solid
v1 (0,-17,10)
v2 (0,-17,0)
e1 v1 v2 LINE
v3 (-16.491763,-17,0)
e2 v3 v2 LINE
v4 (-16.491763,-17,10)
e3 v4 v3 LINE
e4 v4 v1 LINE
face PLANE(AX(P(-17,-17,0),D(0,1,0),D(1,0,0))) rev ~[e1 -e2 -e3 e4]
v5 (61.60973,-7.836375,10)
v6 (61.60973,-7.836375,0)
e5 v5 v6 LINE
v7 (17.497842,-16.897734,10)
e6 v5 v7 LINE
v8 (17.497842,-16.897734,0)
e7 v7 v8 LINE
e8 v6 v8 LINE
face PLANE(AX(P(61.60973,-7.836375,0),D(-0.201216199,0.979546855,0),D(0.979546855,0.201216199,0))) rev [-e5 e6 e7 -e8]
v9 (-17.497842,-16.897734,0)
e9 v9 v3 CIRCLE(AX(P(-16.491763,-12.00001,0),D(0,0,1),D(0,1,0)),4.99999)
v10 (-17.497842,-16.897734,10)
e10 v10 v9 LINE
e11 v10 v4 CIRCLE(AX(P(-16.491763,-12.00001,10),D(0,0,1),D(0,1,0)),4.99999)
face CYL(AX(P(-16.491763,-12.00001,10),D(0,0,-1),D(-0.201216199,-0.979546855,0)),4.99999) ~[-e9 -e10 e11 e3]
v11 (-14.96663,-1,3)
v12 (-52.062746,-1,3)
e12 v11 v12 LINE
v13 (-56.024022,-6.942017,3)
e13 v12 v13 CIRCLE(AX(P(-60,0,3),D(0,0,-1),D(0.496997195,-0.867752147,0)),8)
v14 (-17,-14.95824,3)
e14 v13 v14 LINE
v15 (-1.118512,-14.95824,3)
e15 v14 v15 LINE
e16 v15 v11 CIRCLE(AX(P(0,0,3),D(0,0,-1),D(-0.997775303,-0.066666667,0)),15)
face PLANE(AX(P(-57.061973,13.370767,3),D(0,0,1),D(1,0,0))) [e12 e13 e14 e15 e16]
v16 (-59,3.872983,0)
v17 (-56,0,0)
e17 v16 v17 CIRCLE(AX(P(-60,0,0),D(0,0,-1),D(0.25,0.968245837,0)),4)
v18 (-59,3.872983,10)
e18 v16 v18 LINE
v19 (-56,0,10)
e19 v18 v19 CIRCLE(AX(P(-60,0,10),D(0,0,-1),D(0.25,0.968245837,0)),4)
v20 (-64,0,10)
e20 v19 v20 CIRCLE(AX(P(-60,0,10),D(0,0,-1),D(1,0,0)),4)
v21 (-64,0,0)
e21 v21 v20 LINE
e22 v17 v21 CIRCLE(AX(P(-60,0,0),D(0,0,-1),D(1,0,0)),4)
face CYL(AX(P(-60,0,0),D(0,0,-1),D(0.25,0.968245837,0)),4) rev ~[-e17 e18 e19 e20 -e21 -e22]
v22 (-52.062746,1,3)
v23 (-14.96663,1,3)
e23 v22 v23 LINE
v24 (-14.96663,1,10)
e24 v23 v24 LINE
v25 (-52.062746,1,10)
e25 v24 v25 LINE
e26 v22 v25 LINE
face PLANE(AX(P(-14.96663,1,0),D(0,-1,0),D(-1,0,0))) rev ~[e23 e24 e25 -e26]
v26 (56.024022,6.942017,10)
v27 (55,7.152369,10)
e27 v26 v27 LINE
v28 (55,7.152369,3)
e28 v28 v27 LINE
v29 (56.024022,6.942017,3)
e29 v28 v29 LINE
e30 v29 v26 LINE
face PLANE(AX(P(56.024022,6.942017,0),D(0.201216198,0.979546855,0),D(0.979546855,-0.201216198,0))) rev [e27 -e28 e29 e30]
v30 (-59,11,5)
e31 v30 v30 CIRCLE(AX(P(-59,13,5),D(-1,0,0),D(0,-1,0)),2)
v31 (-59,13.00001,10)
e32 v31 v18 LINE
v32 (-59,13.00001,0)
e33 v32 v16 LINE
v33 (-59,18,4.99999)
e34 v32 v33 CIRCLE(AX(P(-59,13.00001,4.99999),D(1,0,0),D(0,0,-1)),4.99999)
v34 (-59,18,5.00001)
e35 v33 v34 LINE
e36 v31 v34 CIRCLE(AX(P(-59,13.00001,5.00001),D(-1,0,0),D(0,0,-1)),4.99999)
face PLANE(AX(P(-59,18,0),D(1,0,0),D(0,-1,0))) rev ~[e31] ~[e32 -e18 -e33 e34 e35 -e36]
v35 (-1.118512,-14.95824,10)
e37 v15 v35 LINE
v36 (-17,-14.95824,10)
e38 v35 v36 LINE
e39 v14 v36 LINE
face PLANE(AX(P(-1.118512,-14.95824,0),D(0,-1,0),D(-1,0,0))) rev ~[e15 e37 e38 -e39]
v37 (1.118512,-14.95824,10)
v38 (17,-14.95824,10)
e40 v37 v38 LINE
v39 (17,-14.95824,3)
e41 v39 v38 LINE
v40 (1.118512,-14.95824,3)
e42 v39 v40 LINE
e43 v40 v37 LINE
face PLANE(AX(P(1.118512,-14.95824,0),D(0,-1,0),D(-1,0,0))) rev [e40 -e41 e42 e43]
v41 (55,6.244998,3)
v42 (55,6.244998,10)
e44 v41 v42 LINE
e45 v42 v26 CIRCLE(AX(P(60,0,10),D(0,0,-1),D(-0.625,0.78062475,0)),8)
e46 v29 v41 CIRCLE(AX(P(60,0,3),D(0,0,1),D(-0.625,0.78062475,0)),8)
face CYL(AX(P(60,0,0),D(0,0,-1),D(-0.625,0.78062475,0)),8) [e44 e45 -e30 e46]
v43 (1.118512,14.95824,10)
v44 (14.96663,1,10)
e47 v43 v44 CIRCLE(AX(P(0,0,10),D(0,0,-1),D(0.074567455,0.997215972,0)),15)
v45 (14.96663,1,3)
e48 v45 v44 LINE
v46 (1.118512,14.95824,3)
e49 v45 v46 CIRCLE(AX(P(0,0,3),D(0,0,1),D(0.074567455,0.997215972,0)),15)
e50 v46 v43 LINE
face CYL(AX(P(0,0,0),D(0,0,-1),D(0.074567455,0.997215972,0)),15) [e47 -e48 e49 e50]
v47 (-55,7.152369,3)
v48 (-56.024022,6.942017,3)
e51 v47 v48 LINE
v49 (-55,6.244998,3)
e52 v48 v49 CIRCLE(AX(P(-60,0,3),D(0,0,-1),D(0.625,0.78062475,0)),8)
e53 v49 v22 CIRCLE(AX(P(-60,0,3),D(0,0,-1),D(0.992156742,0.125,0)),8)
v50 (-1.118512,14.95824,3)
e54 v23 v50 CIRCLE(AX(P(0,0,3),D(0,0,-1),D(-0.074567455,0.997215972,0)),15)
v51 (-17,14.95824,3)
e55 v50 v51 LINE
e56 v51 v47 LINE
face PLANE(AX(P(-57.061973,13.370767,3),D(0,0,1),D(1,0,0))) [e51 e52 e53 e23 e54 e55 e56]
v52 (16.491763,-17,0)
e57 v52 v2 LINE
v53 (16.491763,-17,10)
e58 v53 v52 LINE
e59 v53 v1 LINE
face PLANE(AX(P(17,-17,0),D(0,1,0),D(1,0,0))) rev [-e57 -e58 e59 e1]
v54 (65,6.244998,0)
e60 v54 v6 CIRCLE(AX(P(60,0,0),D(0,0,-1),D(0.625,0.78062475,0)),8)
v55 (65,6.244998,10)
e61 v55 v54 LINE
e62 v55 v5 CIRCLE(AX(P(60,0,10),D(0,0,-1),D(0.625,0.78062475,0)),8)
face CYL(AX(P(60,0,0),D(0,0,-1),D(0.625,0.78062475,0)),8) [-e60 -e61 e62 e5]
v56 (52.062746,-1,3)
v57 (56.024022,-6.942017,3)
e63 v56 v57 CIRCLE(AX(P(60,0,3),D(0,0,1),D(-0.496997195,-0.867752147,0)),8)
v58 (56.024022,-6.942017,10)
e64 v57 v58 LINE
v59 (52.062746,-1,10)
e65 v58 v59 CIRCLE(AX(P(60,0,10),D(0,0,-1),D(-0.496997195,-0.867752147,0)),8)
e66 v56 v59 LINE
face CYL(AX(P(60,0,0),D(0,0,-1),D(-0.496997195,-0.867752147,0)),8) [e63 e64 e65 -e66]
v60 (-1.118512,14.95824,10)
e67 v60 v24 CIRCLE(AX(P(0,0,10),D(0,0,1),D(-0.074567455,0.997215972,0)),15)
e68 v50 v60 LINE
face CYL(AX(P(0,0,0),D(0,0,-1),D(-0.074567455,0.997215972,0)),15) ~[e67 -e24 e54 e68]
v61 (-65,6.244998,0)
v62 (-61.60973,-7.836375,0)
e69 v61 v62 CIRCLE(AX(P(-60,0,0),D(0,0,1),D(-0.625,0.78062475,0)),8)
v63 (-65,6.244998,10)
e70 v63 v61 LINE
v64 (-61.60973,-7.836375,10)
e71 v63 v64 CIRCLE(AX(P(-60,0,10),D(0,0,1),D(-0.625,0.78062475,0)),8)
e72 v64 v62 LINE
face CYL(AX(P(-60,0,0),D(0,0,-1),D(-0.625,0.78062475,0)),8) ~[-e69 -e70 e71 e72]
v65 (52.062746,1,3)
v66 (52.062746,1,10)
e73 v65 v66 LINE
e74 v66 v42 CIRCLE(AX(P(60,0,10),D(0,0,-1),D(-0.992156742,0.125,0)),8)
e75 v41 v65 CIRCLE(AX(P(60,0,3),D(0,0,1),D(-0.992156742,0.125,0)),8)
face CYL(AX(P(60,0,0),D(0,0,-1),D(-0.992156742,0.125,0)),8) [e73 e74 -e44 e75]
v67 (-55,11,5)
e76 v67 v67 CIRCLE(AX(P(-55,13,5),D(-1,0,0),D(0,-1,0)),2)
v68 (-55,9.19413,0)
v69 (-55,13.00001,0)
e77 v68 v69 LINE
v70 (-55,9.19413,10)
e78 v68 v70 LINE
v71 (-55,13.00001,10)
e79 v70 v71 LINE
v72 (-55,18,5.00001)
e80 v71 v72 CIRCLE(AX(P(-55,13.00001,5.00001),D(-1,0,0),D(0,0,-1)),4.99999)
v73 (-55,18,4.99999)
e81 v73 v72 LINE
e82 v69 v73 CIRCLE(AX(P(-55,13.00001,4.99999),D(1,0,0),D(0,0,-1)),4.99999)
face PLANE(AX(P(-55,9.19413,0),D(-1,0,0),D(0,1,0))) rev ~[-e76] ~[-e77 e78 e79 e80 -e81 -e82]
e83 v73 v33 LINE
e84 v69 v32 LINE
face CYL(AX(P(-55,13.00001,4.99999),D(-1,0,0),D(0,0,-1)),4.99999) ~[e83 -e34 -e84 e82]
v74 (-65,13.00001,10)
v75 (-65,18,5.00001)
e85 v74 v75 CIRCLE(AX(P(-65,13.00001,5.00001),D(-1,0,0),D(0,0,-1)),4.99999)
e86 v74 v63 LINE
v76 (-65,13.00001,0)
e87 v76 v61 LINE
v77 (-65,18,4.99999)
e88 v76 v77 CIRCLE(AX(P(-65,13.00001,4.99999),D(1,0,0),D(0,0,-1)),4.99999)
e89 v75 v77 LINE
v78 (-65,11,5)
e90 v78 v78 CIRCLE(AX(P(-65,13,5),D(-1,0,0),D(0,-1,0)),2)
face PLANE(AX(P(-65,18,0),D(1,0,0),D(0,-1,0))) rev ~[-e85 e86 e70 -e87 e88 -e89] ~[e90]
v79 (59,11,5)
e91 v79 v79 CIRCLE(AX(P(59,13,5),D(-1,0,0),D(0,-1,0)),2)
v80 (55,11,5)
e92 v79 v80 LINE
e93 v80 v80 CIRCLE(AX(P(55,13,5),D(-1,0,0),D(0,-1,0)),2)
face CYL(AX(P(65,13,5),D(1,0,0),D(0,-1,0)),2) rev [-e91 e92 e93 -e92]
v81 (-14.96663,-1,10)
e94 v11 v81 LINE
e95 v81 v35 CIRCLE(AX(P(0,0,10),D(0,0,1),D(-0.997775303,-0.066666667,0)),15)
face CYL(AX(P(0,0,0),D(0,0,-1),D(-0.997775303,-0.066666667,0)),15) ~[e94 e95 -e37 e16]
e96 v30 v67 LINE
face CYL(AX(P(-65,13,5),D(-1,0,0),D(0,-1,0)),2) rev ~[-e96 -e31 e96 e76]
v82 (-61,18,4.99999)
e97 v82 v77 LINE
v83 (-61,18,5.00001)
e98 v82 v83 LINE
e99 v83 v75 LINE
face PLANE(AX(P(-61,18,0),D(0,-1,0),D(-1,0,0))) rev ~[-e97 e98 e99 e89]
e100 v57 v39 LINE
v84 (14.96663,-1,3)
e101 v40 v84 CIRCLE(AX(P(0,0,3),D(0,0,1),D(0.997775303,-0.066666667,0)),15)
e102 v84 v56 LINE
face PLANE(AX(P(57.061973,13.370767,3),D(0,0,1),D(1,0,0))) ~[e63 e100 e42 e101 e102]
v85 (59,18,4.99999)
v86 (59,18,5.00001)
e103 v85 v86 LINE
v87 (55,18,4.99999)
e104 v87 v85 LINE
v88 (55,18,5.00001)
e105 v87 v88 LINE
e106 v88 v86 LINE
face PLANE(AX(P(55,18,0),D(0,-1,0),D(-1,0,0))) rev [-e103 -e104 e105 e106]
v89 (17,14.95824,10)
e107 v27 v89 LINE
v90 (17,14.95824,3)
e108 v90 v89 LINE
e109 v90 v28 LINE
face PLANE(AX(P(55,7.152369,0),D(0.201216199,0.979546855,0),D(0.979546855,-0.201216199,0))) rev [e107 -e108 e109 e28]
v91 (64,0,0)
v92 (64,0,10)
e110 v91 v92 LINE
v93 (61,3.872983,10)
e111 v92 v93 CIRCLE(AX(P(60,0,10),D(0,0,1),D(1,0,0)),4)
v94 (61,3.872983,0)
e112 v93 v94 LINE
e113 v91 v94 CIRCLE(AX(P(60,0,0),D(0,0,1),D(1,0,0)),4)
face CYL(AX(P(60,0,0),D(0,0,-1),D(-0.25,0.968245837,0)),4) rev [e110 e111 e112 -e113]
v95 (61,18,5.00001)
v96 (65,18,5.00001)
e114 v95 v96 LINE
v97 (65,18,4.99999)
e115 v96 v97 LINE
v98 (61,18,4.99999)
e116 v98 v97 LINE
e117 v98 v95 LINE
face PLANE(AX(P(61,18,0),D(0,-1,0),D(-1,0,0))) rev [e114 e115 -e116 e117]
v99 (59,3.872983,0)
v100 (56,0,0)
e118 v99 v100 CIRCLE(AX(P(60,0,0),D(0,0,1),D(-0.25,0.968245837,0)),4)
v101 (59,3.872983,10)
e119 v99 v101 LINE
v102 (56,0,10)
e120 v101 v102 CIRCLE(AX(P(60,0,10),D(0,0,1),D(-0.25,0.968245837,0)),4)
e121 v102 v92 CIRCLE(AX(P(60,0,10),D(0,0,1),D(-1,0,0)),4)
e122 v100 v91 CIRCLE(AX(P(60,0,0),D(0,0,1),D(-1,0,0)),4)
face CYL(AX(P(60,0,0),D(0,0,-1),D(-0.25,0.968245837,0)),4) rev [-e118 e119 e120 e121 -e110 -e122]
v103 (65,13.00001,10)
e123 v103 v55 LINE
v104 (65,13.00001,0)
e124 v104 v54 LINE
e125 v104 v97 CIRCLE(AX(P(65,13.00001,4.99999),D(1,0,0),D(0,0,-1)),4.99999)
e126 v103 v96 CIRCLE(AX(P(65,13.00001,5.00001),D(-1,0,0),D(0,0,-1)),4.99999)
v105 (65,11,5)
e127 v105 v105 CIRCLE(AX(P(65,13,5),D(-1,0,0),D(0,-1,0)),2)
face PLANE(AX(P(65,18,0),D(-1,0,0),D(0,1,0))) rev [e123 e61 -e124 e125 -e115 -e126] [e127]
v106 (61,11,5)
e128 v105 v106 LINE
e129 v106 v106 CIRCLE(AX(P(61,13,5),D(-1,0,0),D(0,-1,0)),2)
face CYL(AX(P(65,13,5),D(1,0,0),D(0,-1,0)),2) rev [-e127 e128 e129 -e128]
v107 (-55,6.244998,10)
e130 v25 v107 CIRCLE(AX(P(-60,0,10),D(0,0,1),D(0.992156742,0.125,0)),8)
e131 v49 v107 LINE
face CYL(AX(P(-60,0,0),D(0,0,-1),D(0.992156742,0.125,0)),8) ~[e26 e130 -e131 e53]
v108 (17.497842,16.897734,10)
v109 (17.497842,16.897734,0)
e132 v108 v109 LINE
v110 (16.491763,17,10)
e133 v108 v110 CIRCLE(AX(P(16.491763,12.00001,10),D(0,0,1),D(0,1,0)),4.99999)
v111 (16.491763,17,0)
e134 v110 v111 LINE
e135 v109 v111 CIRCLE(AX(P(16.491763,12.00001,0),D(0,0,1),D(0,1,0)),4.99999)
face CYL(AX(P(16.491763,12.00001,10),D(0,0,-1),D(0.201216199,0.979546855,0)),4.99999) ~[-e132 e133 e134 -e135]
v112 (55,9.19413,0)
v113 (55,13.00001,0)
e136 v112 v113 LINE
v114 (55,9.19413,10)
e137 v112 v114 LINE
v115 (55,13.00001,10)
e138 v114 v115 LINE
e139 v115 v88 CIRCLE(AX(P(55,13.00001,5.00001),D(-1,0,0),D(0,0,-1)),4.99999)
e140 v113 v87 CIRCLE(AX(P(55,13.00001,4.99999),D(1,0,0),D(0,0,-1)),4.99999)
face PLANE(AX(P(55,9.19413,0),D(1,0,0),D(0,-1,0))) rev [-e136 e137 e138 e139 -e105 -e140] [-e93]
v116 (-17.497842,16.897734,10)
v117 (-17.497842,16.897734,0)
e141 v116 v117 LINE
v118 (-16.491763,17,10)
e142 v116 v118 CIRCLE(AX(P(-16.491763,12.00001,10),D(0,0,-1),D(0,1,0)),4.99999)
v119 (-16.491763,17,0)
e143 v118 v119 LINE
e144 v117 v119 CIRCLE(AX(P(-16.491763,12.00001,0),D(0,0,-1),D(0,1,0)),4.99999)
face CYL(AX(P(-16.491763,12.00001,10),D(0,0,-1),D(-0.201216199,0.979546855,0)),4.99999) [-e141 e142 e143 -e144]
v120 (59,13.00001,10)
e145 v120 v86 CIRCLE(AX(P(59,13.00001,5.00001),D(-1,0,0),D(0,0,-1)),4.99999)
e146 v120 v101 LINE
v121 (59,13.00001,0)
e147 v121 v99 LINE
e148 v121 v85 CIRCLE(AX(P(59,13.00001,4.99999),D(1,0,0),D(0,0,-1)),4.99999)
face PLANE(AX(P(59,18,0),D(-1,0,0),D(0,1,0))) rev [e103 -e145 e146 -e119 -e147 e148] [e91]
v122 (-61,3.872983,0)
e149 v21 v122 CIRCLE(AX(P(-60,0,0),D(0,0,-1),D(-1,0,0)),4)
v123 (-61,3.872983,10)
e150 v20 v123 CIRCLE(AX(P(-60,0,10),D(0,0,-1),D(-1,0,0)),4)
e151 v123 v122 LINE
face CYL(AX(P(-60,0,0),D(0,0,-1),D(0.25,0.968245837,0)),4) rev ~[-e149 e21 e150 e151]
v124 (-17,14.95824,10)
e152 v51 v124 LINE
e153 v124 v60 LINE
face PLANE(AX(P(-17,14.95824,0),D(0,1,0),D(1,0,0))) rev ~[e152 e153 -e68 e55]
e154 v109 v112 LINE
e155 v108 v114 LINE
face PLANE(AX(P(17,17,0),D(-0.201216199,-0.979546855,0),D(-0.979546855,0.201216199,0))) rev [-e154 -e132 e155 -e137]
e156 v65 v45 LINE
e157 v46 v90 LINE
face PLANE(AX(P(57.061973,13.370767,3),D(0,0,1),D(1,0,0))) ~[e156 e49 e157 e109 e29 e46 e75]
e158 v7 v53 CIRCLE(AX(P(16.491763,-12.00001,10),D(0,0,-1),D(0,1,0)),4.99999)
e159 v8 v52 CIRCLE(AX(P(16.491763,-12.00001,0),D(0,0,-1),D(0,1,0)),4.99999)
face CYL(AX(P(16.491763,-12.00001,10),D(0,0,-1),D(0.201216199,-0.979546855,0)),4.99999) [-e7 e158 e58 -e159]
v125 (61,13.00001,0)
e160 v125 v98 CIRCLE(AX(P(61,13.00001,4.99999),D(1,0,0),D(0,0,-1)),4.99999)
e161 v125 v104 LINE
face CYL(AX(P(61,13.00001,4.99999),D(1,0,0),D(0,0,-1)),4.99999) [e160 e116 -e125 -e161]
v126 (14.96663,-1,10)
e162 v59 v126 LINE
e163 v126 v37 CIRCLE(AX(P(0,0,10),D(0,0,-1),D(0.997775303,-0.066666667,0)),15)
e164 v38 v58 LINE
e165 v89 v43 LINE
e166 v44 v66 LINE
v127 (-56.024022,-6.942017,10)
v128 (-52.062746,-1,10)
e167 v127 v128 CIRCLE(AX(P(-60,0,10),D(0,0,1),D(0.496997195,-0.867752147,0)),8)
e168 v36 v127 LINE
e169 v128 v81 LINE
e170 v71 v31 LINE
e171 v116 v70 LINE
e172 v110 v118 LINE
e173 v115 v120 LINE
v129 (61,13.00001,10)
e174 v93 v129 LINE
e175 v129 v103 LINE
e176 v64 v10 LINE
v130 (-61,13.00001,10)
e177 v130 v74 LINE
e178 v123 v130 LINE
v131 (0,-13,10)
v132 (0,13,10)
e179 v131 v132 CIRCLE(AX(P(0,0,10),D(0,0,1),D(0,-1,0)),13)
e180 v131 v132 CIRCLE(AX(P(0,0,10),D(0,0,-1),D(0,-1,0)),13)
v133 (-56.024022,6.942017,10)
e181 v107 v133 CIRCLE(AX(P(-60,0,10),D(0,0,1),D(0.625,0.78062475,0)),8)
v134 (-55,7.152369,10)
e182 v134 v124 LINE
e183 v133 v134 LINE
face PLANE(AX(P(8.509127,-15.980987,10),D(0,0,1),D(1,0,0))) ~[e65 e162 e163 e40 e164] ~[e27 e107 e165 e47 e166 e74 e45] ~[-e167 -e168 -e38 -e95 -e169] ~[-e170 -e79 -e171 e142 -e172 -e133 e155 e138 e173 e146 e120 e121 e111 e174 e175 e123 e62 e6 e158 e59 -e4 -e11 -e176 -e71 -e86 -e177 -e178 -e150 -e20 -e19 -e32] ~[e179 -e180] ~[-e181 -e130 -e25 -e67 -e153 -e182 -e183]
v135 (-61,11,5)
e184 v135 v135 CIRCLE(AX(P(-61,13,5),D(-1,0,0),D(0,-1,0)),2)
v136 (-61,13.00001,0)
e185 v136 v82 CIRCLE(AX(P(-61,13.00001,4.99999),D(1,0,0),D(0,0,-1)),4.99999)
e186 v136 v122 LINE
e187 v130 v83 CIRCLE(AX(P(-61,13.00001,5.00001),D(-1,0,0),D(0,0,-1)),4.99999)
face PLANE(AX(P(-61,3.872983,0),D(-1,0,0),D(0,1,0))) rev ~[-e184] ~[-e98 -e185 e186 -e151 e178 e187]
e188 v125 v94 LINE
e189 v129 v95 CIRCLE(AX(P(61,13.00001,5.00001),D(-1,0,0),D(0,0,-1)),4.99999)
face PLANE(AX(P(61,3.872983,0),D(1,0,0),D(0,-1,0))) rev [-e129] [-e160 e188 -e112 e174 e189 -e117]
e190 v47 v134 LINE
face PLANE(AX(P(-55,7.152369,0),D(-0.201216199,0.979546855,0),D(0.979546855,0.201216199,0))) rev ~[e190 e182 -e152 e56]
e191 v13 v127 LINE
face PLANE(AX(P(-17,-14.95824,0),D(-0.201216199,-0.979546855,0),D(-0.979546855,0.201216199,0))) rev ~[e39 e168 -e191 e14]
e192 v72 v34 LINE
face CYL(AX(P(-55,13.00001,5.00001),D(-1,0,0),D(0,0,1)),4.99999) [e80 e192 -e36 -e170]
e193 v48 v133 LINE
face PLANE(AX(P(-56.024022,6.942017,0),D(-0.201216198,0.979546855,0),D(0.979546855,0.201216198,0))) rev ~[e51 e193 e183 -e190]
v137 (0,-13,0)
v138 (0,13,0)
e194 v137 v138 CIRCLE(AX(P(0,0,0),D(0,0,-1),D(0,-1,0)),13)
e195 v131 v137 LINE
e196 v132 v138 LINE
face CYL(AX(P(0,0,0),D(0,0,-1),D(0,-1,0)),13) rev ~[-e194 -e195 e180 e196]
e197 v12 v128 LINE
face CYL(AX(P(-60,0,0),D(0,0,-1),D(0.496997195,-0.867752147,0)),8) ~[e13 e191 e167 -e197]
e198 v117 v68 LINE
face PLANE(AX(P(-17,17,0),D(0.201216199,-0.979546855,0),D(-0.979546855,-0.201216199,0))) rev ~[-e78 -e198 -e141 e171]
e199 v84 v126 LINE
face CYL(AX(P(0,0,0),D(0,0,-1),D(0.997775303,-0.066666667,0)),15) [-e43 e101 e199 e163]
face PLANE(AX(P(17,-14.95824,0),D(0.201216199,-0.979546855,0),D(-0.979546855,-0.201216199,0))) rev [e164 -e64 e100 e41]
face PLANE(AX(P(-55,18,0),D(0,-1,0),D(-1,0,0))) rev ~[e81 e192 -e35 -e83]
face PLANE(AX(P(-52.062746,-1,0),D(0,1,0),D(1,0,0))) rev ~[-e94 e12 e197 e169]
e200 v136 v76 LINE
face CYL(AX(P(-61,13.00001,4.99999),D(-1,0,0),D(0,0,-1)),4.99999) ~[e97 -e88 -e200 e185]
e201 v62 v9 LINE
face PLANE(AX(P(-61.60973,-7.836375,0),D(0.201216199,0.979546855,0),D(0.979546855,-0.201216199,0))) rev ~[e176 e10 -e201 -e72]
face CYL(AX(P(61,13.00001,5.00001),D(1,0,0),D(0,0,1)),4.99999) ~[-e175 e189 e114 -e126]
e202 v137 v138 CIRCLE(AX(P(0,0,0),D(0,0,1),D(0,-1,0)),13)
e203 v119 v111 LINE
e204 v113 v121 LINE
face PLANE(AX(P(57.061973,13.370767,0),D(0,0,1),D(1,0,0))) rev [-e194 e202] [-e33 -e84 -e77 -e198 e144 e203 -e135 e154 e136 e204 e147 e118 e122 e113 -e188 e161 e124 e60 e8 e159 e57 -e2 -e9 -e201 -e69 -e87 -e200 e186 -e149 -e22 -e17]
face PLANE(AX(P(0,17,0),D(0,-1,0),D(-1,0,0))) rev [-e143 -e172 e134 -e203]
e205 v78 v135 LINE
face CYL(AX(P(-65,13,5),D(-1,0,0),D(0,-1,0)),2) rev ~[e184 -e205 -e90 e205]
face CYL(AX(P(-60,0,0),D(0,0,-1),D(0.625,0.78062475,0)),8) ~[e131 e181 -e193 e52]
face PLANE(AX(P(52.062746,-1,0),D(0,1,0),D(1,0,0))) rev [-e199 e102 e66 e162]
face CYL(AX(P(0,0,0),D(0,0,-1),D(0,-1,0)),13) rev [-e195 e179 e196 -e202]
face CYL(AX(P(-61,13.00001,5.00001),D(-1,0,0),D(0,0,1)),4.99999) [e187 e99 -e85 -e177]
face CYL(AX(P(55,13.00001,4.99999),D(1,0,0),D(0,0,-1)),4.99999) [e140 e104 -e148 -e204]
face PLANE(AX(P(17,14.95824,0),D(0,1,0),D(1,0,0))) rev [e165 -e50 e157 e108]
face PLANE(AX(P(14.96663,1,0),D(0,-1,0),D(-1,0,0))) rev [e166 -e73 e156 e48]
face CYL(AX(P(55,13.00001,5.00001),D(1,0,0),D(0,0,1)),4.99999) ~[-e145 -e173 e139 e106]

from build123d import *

# Parameters (mm, degrees)
F1_DEPTH = 3
F2_DEPTH = 10
F3_R     = 2
F4_DEPTH = 12
F5_R     = 4.99999


# Not quite as in the source:
# - a fillet or chamfer is up to 0.001 mm smaller than in the source, because OpenCascade refuses the exact size


with BuildPart() as f1:
    # F0 (on Top) → F1 (new body)
    with BuildSketch(Plane.XY):
        Polygon((-59, 8.3724593218), (-55, 9.1941298626), (-55, 18), (-59, 18), align=None)
        with BuildLine():
            Line((-56.0240224388, 6.9420171732), (-55, 7.1523694409))
            Line((-55, 7.1523694409), (-55, 9.1941298626))
            Line((-55, 9.1941298626), (-59, 8.3724593218))
            Line((-59, 8.3724593218), (-59, 7.9372539332))
            ThreePointArc((-59, 7.9372539332), (-57.4627352868, 7.5869814667), (-56.0240224388, 6.9420171732))
        make_face()
        with BuildLine():
            Line((-55, 0), (-55, 6.2449979984))
            ThreePointArc((-55, 6.2449979984), (-55.4985000025, 6.6133575264), (-56.0240224388, 6.9420171732))
            ThreePointArc((-56.0240224388, 6.9420171732), (-57.4627352868, 7.5869814667), (-59, 7.9372539332))
            Line((-59, 7.9372539332), (-59, 3.8729833462))
            ThreePointArc((-59, 3.8729833462), (-56.8377223398, 2.4494897428), (-56, 0))
            Line((-56, 0), (-55, 0))
        make_face()
        with BuildLine():
            ThreePointArc((-61.6097295884, 7.8363748412), (-63.3993016006, 7.2418746626), (-65, 6.2449979984))
            Line((-65, 6.2449979984), (-65, 0))
            Line((-65, 0), (-64, 0))
            ThreePointArc((-64, 0), (-63.1622776602, 2.4494897428), (-61, 3.8729833462))
            Line((-61, 3.8729833462), (-61, 7.9372539332))
            ThreePointArc((-61, 7.9372539332), (-61.3058393006, 7.8927044618), (-61.6097295884, 7.8363748412))
        make_face()
        with BuildLine():
            Line((-65, 18), (-65, 6.2449979984))
            ThreePointArc((-65, 6.2449979984), (-63.3993016006, 7.2418746626), (-61.6097295884, 7.8363748412))
            Line((-61.6097295884, 7.8363748412), (-61, 7.9616240514))
            Line((-61, 7.9616240514), (-61, 18))
            Line((-61, 18), (-65, 18))
        make_face()
        with BuildLine():
            ThreePointArc((-61.6097295884, -7.8363748412), (-58.7351872562, -7.8993828065), (-56.0240224388, -6.9420171732))
            ThreePointArc((-56.0240224388, -6.9420171732), (-53.3435622754, -4.4375485145), (-52.0627460668, -1))
            ThreePointArc((-52.0627460668, -1), (-52.0157019261, -0.5009833003), (-52, 0))
            ThreePointArc((-52, 0), (-52.0157019261, 0.5009833003), (-52.0627460668, 1))
            ThreePointArc((-52.0627460668, 1), (-53.0199831065, 3.9088827261), (-55, 6.2449979984))
            Line((-55, 6.2449979984), (-55, 0))
            Line((-55, 0), (-56, 0))
            ThreePointArc((-56, 0), (-60, -4), (-64, 0))
            Line((-64, 0), (-65, 0))
            Line((-65, 0), (-65, 6.2449979984))
            ThreePointArc((-65, 6.2449979984), (-67.7777500969, -1.8725927026), (-61.6097295884, -7.8363748412))
        make_face()
        with BuildLine():
            Line((-56.0240224388, -6.9420171732), (-17, -14.9582395784))
            Line((-17, -14.9582395784), (-17, -1))
            Line((-17, -1), (-52.0627460668, -1))
            ThreePointArc((-52.0627460668, -1), (-53.3435622754, -4.4375485145), (-56.0240224388, -6.9420171732))
        make_face()
        with BuildLine():
            Line((-17, 1), (-17, 14.9582395784))
            Line((-17, 14.9582395784), (-55, 7.1523694409))
            Line((-55, 7.1523694409), (-55, 6.2449979984))
            ThreePointArc((-55, 6.2449979984), (-53.0199831065, 3.9088827261), (-52.0627460668, 1))
            Line((-52.0627460668, 1), (-17, 1))
        make_face()
        Polygon((-55, 7.1523694409), (-17, 14.9582395784), (-17, 17), (-55, 9.1941298626), align=None)
        with BuildLine():
            Line((-17, -1), (-17, 1))
            Line((-17, 1), (-52.0627460668, 1))
            ThreePointArc((-52.0627460668, 1), (-52.0157019261, 0.5009833003), (-52, 0))
            ThreePointArc((-52, 0), (-52.0157019261, -0.5009833003), (-52.0627460668, -1))
            Line((-52.0627460668, -1), (-17, -1))
        make_face()
        with BuildLine():
            Line((-17, -17), (-17, -14.9582395784))
            Line((-17, -14.9582395784), (-56.0240224388, -6.9420171732))
            ThreePointArc((-56.0240224388, -6.9420171732), (-58.7351872562, -7.8993828065), (-61.6097295884, -7.8363748412))
            Line((-61.6097295884, -7.8363748412), (-17, -17))
        make_face()
        with BuildLine():
            Line((0, -17), (0, -15))
            ThreePointArc((0, -15), (-0.5596455685, -14.9895562589), (-1.1185118312, -14.9582395784))
            Line((-1.1185118312, -14.9582395784), (-17, -14.9582395784))
            Line((-17, -14.9582395784), (-17, -17))
            Line((-17, -17), (0, -17))
        make_face()
        with BuildLine():
            Line((0, -15), (0, -14.9582395784))
            Line((0, -14.9582395784), (-1.1185118312, -14.9582395784))
            ThreePointArc((-1.1185118312, -14.9582395784), (-0.5596455685, -14.9895562589), (0, -15))
        make_face()
        with BuildLine():
            Line((-17, -14.9582395784), (-1.1185118312, -14.9582395784))
            ThreePointArc((-1.1185118312, -14.9582395784), (-10.6485236686, -10.5645134142), (-14.9666295471, -1))
            Line((-14.9666295471, -1), (-17, -1))
            Line((-17, -1), (-17, -14.9582395784))
        make_face()
        with BuildLine():
            ThreePointArc((0, -13), (-13, 0), (0, 13))
            Line((0, 13), (0, 14.9582395784))
            Line((0, 14.9582395784), (-1.1185118312, 14.9582395784))
            ThreePointArc((-1.1185118312, 14.9582395784), (-10.6485236686, 10.5645134142), (-14.9666295471, 1))
            ThreePointArc((-14.9666295471, 1), (-15, 0), (-14.9666295471, -1))
            ThreePointArc((-14.9666295471, -1), (-10.6485236686, -10.5645134142), (-1.1185118312, -14.9582395784))
            Line((-1.1185118312, -14.9582395784), (0, -14.9582395784))
            Line((0, -14.9582395784), (0, -13))
        make_face()
        with BuildLine():
            ThreePointArc((-14.9666295471, -1), (-15, 0), (-14.9666295471, 1))
            Line((-14.9666295471, 1), (-17, 1))
            Line((-17, 1), (-17, -1))
            Line((-17, -1), (-14.9666295471, -1))
        make_face()
        with BuildLine():
            ThreePointArc((-14.9666295471, 1), (-10.6485236686, 10.5645134142), (-1.1185118312, 14.9582395784))
            Line((-1.1185118312, 14.9582395784), (-17, 14.9582395784))
            Line((-17, 14.9582395784), (-17, 1))
            Line((-17, 1), (-14.9666295471, 1))
        make_face()
        with BuildLine():
            ThreePointArc((-1.1185118312, 14.9582395784), (-0.5596455685, 14.9895562589), (0, 15))
            Line((0, 15), (0, 17))
            Line((0, 17), (-17, 17))
            Line((-17, 17), (-17, 14.9582395784))
            Line((-17, 14.9582395784), (-1.1185118312, 14.9582395784))
        make_face()
        with BuildLine():
            Line((-1.1185118312, 14.9582395784), (0, 14.9582395784))
            Line((0, 14.9582395784), (0, 15))
            ThreePointArc((0, 15), (-0.5596455685, 14.9895562589), (-1.1185118312, 14.9582395784))
        make_face()
        with BuildLine():
            Line((-55, 6.2449979984), (-55, 7.1523694409))
            Line((-55, 7.1523694409), (-56.0240224388, 6.9420171732))
            ThreePointArc((-56.0240224388, 6.9420171732), (-55.4985000025, 6.6133575264), (-55, 6.2449979984))
        make_face()
    extrude(amount=F1_DEPTH)

    # F0 (on Top) → F2 (join)
    with BuildSketch(Plane.XY):
        with BuildLine():
            Line((0, -17), (0, -15))
            ThreePointArc((0, -15), (-0.5596455685, -14.9895562589), (-1.1185118312, -14.9582395784))
            Line((-1.1185118312, -14.9582395784), (-17, -14.9582395784))
            Line((-17, -14.9582395784), (-17, -17))
            Line((-17, -17), (0, -17))
        make_face()
        with BuildLine():
            Line((0, -15), (0, -14.9582395784))
            Line((0, -14.9582395784), (-1.1185118312, -14.9582395784))
            ThreePointArc((-1.1185118312, -14.9582395784), (-0.5596455685, -14.9895562589), (0, -15))
        make_face()
        with BuildLine():
            Line((-17, -17), (-17, -14.9582395784))
            Line((-17, -14.9582395784), (-56.0240224388, -6.9420171732))
            ThreePointArc((-56.0240224388, -6.9420171732), (-58.7351872562, -7.8993828065), (-61.6097295884, -7.8363748412))
            Line((-61.6097295884, -7.8363748412), (-17, -17))
        make_face()
        with BuildLine():
            ThreePointArc((0, -13), (-13, 0), (0, 13))
            Line((0, 13), (0, 14.9582395784))
            Line((0, 14.9582395784), (-1.1185118312, 14.9582395784))
            ThreePointArc((-1.1185118312, 14.9582395784), (-10.6485236686, 10.5645134142), (-14.9666295471, 1))
            ThreePointArc((-14.9666295471, 1), (-15, 0), (-14.9666295471, -1))
            ThreePointArc((-14.9666295471, -1), (-10.6485236686, -10.5645134142), (-1.1185118312, -14.9582395784))
            Line((-1.1185118312, -14.9582395784), (0, -14.9582395784))
            Line((0, -14.9582395784), (0, -13))
        make_face()
        with BuildLine():
            ThreePointArc((-1.1185118312, 14.9582395784), (-0.5596455685, 14.9895562589), (0, 15))
            Line((0, 15), (0, 17))
            Line((0, 17), (-17, 17))
            Line((-17, 17), (-17, 14.9582395784))
            Line((-17, 14.9582395784), (-1.1185118312, 14.9582395784))
        make_face()
        with BuildLine():
            Line((-1.1185118312, 14.9582395784), (0, 14.9582395784))
            Line((0, 14.9582395784), (0, 15))
            ThreePointArc((0, 15), (-0.5596455685, 14.9895562589), (-1.1185118312, 14.9582395784))
        make_face()
        Polygon((-55, 7.1523694409), (-17, 14.9582395784), (-17, 17), (-55, 9.1941298626), align=None)
        with BuildLine():
            Line((-56.0240224388, 6.9420171732), (-55, 7.1523694409))
            Line((-55, 7.1523694409), (-55, 9.1941298626))
            Line((-55, 9.1941298626), (-59, 8.3724593218))
            Line((-59, 8.3724593218), (-59, 7.9372539332))
            ThreePointArc((-59, 7.9372539332), (-57.4627352868, 7.5869814667), (-56.0240224388, 6.9420171732))
        make_face()
        with BuildLine():
            ThreePointArc((-61.6097295884, -7.8363748412), (-58.7351872562, -7.8993828065), (-56.0240224388, -6.9420171732))
            ThreePointArc((-56.0240224388, -6.9420171732), (-53.3435622754, -4.4375485145), (-52.0627460668, -1))
            ThreePointArc((-52.0627460668, -1), (-52.0157019261, -0.5009833003), (-52, 0))
            ThreePointArc((-52, 0), (-52.0157019261, 0.5009833003), (-52.0627460668, 1))
            ThreePointArc((-52.0627460668, 1), (-53.0199831065, 3.9088827261), (-55, 6.2449979984))
            Line((-55, 6.2449979984), (-55, 0))
            Line((-55, 0), (-56, 0))
            ThreePointArc((-56, 0), (-60, -4), (-64, 0))
            Line((-64, 0), (-65, 0))
            Line((-65, 0), (-65, 6.2449979984))
            ThreePointArc((-65, 6.2449979984), (-67.7777500969, -1.8725927026), (-61.6097295884, -7.8363748412))
        make_face()
        with BuildLine():
            Line((-55, 0), (-55, 6.2449979984))
            ThreePointArc((-55, 6.2449979984), (-55.4985000025, 6.6133575264), (-56.0240224388, 6.9420171732))
            ThreePointArc((-56.0240224388, 6.9420171732), (-57.4627352868, 7.5869814667), (-59, 7.9372539332))
            Line((-59, 7.9372539332), (-59, 3.8729833462))
            ThreePointArc((-59, 3.8729833462), (-56.8377223398, 2.4494897428), (-56, 0))
            Line((-56, 0), (-55, 0))
        make_face()
        with BuildLine():
            ThreePointArc((-61.6097295884, 7.8363748412), (-63.3993016006, 7.2418746626), (-65, 6.2449979984))
            Line((-65, 6.2449979984), (-65, 0))
            Line((-65, 0), (-64, 0))
            ThreePointArc((-64, 0), (-63.1622776602, 2.4494897428), (-61, 3.8729833462))
            Line((-61, 3.8729833462), (-61, 7.9372539332))
            ThreePointArc((-61, 7.9372539332), (-61.3058393006, 7.8927044618), (-61.6097295884, 7.8363748412))
        make_face()
        with BuildLine():
            Line((-65, 18), (-65, 6.2449979984))
            ThreePointArc((-65, 6.2449979984), (-63.3993016006, 7.2418746626), (-61.6097295884, 7.8363748412))
            Line((-61.6097295884, 7.8363748412), (-61, 7.9616240514))
            Line((-61, 7.9616240514), (-61, 18))
            Line((-61, 18), (-65, 18))
        make_face()
        Polygon((-59, 8.3724593218), (-55, 9.1941298626), (-55, 18), (-59, 18), align=None)
        with BuildLine():
            Line((-17, -1), (-17, 1))
            Line((-17, 1), (-52.0627460668, 1))
            ThreePointArc((-52.0627460668, 1), (-52.0157019261, 0.5009833003), (-52, 0))
            ThreePointArc((-52, 0), (-52.0157019261, -0.5009833003), (-52.0627460668, -1))
            Line((-52.0627460668, -1), (-17, -1))
        make_face()
        with BuildLine():
            ThreePointArc((-14.9666295471, -1), (-15, 0), (-14.9666295471, 1))
            Line((-14.9666295471, 1), (-17, 1))
            Line((-17, 1), (-17, -1))
            Line((-17, -1), (-14.9666295471, -1))
        make_face()
        with BuildLine():
            Line((-61, 7.9372539332), (-61, 7.9616240514))
            Line((-61, 7.9616240514), (-61.6097295884, 7.8363748412))
            ThreePointArc((-61.6097295884, 7.8363748412), (-61.3058393006, 7.8927044618), (-61, 7.9372539332))
        make_face()
    extrude(amount=F2_DEPTH)

    # F3 (on face) → F4 (cut)
    with BuildSketch(Plane(origin=(-65, 0, 0), x_dir=(0, -1, 0), z_dir=(-1, 0, 0))):
        with Locations((-13, 5)):
            Circle(F3_R)
    extrude(amount=-F4_DEPTH, mode=Mode.SUBTRACT)

    # F5 (radius 5 in the source; OpenCascade refuses exactly that, so slightly less here)
    f5_edges = [f1.edges().sort_by_distance(p)[0] for p in [
        (-63, 18, 0),
        (-57, 18, 0),
        (-57, 18, 10),
        (-63, 18, 10),
        (-17, 17, 5),
        (-17, -17, 5),
    ]]
    fillet(f5_edges, radius=F5_R)

    # F6: F1 across face


with BuildPart() as f1_1:
    add(f1.part)
    add(f1.part.mirror(Plane(origin=(0, -15, 5), x_dir=(0, 1, 0), z_dir=(1, 0, 0))))


solid = f1_1.part
